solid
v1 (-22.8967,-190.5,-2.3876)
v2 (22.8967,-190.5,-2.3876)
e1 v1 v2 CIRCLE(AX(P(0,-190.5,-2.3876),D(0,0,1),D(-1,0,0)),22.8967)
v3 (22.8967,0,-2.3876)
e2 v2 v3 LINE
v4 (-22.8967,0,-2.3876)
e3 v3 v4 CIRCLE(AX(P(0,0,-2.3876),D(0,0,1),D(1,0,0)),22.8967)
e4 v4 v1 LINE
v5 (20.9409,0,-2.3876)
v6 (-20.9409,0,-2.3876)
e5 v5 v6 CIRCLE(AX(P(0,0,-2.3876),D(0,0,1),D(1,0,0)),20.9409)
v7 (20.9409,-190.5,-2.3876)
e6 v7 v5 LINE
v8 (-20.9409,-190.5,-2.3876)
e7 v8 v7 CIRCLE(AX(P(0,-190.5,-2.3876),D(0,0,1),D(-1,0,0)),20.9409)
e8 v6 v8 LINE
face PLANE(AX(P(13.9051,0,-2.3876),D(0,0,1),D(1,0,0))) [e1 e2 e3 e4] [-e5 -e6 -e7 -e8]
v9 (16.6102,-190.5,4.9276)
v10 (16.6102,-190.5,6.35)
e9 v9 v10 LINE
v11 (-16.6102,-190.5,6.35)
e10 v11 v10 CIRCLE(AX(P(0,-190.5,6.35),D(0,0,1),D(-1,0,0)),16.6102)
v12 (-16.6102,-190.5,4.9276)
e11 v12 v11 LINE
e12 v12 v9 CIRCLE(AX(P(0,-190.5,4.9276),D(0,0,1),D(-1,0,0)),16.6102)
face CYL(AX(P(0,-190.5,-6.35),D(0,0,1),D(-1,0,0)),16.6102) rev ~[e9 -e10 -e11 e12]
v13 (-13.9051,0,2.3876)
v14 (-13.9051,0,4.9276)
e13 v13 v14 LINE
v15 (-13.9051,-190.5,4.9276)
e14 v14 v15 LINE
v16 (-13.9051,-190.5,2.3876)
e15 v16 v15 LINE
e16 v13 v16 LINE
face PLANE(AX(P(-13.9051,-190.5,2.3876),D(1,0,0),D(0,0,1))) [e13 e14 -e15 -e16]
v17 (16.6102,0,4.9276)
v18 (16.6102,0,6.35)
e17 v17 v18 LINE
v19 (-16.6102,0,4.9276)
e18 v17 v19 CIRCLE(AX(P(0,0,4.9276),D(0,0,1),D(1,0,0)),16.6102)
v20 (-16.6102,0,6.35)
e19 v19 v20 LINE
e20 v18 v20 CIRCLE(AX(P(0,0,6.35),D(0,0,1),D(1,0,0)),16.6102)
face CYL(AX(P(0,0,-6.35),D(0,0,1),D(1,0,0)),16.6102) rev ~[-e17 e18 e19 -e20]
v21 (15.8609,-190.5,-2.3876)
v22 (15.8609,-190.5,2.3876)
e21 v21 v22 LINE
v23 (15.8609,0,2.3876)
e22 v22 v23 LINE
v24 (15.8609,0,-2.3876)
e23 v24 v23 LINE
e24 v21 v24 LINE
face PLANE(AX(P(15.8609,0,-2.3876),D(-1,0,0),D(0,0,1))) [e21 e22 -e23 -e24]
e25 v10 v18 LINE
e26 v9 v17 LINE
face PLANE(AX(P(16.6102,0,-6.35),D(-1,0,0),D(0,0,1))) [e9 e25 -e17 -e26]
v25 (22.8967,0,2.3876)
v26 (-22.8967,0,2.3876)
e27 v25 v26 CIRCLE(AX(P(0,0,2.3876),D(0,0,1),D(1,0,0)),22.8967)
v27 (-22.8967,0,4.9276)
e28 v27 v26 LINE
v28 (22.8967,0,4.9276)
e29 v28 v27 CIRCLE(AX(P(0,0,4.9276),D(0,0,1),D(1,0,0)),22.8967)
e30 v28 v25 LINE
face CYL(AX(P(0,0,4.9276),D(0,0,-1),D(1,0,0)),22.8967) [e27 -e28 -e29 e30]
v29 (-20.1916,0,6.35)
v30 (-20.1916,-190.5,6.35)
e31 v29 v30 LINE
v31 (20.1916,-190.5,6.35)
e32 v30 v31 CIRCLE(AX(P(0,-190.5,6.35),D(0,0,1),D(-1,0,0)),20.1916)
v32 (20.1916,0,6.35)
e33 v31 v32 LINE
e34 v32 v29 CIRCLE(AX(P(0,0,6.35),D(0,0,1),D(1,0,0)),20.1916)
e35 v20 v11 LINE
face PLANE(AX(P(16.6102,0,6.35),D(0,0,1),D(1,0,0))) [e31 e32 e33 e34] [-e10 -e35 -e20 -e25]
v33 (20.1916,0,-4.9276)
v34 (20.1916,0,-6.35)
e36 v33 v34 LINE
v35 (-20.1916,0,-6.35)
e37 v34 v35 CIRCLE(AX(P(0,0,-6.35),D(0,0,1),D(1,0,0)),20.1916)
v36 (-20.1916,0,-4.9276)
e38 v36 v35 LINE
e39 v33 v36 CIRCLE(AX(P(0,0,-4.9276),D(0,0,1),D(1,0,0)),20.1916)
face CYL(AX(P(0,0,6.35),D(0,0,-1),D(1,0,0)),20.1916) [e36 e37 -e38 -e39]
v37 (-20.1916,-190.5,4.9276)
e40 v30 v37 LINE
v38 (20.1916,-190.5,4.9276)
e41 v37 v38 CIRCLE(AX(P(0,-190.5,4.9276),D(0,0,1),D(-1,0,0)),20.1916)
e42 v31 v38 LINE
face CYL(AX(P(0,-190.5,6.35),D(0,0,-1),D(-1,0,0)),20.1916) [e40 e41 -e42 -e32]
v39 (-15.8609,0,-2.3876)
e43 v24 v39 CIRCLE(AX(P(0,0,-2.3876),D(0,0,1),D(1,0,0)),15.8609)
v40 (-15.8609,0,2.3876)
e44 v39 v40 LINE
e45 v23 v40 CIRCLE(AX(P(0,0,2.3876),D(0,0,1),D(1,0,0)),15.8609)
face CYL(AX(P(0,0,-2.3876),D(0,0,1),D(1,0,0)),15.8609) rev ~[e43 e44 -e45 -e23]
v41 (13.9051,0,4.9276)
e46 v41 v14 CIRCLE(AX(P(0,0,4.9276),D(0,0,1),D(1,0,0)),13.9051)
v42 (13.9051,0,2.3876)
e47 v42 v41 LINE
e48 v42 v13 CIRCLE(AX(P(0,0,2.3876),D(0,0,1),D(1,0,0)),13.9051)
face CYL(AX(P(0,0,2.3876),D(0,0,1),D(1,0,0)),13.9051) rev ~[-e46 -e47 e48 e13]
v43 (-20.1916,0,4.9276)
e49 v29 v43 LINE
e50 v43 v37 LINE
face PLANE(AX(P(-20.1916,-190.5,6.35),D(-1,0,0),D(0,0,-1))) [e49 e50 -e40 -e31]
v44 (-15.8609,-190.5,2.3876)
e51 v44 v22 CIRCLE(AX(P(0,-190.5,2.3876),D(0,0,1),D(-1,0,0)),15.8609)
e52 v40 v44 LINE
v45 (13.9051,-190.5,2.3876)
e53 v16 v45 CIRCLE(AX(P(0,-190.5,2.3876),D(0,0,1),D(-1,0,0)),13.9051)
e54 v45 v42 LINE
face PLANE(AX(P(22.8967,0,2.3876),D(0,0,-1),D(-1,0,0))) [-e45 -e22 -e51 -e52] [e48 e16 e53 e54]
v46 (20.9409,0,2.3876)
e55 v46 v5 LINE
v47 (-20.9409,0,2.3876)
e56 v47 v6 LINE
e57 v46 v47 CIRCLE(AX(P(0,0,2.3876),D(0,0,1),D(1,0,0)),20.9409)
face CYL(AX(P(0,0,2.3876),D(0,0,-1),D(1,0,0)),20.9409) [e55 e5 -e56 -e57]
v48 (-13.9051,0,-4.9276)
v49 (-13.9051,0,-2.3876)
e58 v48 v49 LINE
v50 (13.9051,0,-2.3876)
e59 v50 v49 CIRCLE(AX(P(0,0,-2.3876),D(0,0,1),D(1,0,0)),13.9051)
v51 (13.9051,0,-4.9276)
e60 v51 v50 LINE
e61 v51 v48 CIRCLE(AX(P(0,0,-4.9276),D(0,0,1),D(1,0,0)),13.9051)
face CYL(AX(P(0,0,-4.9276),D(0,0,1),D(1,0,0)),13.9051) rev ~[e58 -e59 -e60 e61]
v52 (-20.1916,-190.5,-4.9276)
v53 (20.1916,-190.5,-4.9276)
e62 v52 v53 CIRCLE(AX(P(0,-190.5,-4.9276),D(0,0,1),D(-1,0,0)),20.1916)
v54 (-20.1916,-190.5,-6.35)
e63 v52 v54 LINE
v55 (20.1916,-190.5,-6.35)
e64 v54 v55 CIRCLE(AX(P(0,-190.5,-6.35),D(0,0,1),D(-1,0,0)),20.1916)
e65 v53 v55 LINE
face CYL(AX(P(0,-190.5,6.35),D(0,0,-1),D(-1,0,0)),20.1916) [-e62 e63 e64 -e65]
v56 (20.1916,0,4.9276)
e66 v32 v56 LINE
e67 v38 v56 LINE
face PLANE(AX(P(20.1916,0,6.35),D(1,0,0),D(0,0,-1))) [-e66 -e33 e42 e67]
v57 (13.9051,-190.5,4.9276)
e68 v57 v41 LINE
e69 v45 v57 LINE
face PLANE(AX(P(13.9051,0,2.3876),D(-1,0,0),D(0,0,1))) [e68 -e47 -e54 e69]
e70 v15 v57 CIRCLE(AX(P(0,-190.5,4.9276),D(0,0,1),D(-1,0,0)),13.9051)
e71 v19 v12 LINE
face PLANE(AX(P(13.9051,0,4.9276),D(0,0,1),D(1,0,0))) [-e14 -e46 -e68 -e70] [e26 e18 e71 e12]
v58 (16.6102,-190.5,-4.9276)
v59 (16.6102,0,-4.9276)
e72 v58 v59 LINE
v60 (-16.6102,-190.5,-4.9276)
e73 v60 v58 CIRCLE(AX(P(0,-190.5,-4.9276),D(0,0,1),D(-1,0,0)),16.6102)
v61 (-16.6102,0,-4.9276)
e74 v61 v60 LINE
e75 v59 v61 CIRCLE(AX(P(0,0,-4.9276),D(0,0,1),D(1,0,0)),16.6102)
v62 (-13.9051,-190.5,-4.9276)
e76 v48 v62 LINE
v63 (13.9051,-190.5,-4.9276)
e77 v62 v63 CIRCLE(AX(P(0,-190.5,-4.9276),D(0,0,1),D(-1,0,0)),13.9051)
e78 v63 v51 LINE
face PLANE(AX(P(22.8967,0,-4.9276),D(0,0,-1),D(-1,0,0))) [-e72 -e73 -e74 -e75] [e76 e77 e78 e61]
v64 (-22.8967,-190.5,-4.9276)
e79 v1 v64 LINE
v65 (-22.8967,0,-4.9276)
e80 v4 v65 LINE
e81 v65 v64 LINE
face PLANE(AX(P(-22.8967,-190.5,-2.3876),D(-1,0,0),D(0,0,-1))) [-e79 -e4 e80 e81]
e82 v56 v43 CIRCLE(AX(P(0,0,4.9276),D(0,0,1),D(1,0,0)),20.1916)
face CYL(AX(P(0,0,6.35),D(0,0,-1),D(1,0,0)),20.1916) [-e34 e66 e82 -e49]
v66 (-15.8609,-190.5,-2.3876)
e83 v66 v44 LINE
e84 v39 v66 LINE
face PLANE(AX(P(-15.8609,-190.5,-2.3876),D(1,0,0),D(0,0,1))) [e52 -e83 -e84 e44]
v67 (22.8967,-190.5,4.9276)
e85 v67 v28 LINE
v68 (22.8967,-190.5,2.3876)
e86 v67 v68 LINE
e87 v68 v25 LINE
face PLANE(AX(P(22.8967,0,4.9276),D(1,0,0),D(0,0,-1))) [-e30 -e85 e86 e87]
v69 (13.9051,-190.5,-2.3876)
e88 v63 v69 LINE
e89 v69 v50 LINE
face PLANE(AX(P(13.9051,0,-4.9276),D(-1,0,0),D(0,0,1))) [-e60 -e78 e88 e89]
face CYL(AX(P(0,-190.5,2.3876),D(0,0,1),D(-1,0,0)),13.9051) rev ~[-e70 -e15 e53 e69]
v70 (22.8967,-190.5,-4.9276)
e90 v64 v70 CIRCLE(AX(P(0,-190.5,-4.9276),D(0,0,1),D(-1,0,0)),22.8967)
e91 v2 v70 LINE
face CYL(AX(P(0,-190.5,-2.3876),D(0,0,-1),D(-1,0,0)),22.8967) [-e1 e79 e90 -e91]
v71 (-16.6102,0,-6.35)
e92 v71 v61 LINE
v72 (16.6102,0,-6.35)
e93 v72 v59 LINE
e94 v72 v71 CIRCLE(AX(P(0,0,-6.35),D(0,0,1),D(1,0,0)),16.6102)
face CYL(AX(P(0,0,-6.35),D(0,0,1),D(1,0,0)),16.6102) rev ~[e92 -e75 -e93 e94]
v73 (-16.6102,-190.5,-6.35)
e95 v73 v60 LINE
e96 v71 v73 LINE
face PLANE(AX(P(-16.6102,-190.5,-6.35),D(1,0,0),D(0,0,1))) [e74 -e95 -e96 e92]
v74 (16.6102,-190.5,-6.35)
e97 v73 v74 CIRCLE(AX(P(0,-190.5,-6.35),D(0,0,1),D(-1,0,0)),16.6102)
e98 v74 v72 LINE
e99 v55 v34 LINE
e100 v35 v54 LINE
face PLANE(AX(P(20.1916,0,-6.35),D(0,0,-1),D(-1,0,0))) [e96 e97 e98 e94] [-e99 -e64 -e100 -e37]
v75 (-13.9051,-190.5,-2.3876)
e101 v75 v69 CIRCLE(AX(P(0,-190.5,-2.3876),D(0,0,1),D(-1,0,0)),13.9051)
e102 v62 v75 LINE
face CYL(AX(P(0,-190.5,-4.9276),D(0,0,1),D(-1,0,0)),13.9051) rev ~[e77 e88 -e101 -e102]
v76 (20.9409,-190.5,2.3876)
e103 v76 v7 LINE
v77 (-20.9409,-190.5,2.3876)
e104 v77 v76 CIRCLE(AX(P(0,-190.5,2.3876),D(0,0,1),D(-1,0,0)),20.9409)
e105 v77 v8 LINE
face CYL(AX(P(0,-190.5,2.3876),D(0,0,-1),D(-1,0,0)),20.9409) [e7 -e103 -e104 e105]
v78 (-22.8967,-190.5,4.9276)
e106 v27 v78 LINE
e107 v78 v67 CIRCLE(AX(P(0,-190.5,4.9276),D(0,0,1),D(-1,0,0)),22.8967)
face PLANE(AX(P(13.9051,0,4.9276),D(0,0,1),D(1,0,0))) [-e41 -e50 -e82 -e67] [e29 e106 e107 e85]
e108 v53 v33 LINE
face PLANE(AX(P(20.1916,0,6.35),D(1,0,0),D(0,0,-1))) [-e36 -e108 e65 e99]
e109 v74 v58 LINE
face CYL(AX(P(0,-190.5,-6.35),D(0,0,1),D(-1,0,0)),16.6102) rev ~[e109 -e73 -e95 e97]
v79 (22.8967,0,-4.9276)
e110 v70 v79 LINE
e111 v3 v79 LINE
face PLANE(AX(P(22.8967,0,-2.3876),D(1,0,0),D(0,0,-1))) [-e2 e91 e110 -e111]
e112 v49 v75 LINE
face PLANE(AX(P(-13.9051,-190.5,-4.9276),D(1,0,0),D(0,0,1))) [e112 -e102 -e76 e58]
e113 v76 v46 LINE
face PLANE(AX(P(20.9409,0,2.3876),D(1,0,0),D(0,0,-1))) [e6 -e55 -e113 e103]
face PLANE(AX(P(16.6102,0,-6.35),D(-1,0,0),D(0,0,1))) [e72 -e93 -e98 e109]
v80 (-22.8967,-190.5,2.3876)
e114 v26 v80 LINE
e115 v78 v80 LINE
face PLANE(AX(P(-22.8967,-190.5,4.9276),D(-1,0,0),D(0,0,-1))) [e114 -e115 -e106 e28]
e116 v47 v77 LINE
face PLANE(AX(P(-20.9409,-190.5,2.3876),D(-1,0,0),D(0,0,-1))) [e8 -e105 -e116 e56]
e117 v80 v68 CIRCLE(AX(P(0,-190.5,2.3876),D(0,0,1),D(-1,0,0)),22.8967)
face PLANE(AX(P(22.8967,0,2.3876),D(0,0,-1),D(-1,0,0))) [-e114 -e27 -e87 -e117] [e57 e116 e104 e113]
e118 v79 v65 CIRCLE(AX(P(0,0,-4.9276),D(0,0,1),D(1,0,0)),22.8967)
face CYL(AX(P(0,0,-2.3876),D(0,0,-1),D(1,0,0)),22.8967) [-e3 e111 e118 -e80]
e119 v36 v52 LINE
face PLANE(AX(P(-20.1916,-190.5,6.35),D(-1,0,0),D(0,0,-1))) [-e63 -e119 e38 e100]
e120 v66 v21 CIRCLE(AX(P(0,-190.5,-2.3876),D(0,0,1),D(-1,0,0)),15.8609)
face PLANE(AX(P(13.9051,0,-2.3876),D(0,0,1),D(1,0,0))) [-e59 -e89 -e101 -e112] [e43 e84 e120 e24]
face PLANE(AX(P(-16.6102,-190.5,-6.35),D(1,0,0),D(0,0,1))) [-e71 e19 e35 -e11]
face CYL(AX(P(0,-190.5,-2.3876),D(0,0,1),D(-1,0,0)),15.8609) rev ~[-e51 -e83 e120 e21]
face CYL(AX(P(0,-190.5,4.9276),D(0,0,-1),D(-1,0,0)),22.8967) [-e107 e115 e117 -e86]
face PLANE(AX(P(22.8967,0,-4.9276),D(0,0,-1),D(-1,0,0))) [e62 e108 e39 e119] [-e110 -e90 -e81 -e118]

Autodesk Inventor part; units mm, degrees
ref_plane "Work Plane2" through (0, 0, 0) normal (-1, 0, 0) x (0, 0, 1)
ref_plane "Work Plane3" through (0, -190.5, 0) normal (0, 1, 0) x (0, 0, 1)
sketch "Path" plane through (0, 0, 0) normal (0, 0, 1) x (1, 0, 0)
  arc A0 (18.4009, 0) -> (-18.4009, 0) centre (0, 0) ccw
  arc A1 (-18.4009, -190.5) -> (18.4009, -190.5) centre (0, -190.5) ccw
  line L0 (-18.4009, -190.5) -> (-18.4009, 0)
  line L1 (18.4009, 0) -> (18.4009, -190.5)
  dimension "d31" = 8.9916
ref_plane "Section Plane" through (-18.4009, 0, 0) normal (0, -1, 0) x (0, 0, 1)
sketch "Section Sketch" plane through (-18.4009, 0, 0) normal (0, -1, 0) x (0, 0, 1)
  line L0 (-6.35, -1.7907) -> (6.35, -1.7907)
  line L1 (6.35, -1.7907) -> (6.35, 1.7907)
  line L2 (6.35, 1.7907) -> (-6.35, 1.7907)
  line L3 (-6.35, 1.7907) -> (-6.35, -1.7907)
  line L4 (-2.3876, -2.54) -> (2.3876, -2.54)
  line L5 (2.3876, -2.54) -> (2.3876, 2.54)
  line L6 (2.3876, 2.54) -> (-2.3876, 2.54)
  line L7 (-2.3876, 2.54) -> (-2.3876, -2.54)
  line L8 (-2.3876, 0) -> (2.3876, 0) construction
  line L9 (-4.9276, -4.4958) -> (-2.3876, -4.4958)
  line L10 (-2.3876, -4.4958) -> (-2.3876, 4.4958)
  line L11 (-2.3876, 4.4958) -> (-4.9276, 4.4958)
  line L12 (-4.9276, 4.4958) -> (-4.9276, -4.4958)
  line L13 (2.3876, -4.4958) -> (4.9276, -4.4958)
  line L14 (4.9276, -4.4958) -> (4.9276, 4.4958)
  line L15 (4.9276, 4.4958) -> (2.3876, 4.4958)
  line L16 (2.3876, 4.4958) -> (2.3876, -4.4958)
  line L17 (-6.35, 0) -> (6.35, 0) construction
  point P0 (0, 0)
  point P1 (0, 0)
  dimension "d21" = 3.5814
  dimension "d22" = 5.08
  dimension "d23" = 4.7752
  dimension "d24" = 2.54
  dimension "d31" = 8.9916
  dimension "d32" = 12.7
sweep "Solid" add profiles "Section Sketch" path "Path"
pattern_of_one "Strand Pattern"
equation "\"d21\" = da_d2"
equation "\"d22\" = da_d1"
equation "\"d23\" = da_b1"
equation "\"d24\" = da_t1 + da_t2"
equation "\"d30\" = da_pt"
equation "\"da_p\" = 9.525"
equation "\"da_b1\" = 4.7752"
equation "\"da_h2\" = 8.9916"
equation "\"da_h3\" = 7.7978"
equation "\"da_d1\" = 5.08"
equation "\"da_d2\" = 3.5814"
equation "\"da_pt\" = 10.1346"
equation "\"da_b\" = 12.7"
equation "\"da_t1\" = 1.27"
equation "\"da_t2\" = 1.27"
properties part number "Roller Chain"
